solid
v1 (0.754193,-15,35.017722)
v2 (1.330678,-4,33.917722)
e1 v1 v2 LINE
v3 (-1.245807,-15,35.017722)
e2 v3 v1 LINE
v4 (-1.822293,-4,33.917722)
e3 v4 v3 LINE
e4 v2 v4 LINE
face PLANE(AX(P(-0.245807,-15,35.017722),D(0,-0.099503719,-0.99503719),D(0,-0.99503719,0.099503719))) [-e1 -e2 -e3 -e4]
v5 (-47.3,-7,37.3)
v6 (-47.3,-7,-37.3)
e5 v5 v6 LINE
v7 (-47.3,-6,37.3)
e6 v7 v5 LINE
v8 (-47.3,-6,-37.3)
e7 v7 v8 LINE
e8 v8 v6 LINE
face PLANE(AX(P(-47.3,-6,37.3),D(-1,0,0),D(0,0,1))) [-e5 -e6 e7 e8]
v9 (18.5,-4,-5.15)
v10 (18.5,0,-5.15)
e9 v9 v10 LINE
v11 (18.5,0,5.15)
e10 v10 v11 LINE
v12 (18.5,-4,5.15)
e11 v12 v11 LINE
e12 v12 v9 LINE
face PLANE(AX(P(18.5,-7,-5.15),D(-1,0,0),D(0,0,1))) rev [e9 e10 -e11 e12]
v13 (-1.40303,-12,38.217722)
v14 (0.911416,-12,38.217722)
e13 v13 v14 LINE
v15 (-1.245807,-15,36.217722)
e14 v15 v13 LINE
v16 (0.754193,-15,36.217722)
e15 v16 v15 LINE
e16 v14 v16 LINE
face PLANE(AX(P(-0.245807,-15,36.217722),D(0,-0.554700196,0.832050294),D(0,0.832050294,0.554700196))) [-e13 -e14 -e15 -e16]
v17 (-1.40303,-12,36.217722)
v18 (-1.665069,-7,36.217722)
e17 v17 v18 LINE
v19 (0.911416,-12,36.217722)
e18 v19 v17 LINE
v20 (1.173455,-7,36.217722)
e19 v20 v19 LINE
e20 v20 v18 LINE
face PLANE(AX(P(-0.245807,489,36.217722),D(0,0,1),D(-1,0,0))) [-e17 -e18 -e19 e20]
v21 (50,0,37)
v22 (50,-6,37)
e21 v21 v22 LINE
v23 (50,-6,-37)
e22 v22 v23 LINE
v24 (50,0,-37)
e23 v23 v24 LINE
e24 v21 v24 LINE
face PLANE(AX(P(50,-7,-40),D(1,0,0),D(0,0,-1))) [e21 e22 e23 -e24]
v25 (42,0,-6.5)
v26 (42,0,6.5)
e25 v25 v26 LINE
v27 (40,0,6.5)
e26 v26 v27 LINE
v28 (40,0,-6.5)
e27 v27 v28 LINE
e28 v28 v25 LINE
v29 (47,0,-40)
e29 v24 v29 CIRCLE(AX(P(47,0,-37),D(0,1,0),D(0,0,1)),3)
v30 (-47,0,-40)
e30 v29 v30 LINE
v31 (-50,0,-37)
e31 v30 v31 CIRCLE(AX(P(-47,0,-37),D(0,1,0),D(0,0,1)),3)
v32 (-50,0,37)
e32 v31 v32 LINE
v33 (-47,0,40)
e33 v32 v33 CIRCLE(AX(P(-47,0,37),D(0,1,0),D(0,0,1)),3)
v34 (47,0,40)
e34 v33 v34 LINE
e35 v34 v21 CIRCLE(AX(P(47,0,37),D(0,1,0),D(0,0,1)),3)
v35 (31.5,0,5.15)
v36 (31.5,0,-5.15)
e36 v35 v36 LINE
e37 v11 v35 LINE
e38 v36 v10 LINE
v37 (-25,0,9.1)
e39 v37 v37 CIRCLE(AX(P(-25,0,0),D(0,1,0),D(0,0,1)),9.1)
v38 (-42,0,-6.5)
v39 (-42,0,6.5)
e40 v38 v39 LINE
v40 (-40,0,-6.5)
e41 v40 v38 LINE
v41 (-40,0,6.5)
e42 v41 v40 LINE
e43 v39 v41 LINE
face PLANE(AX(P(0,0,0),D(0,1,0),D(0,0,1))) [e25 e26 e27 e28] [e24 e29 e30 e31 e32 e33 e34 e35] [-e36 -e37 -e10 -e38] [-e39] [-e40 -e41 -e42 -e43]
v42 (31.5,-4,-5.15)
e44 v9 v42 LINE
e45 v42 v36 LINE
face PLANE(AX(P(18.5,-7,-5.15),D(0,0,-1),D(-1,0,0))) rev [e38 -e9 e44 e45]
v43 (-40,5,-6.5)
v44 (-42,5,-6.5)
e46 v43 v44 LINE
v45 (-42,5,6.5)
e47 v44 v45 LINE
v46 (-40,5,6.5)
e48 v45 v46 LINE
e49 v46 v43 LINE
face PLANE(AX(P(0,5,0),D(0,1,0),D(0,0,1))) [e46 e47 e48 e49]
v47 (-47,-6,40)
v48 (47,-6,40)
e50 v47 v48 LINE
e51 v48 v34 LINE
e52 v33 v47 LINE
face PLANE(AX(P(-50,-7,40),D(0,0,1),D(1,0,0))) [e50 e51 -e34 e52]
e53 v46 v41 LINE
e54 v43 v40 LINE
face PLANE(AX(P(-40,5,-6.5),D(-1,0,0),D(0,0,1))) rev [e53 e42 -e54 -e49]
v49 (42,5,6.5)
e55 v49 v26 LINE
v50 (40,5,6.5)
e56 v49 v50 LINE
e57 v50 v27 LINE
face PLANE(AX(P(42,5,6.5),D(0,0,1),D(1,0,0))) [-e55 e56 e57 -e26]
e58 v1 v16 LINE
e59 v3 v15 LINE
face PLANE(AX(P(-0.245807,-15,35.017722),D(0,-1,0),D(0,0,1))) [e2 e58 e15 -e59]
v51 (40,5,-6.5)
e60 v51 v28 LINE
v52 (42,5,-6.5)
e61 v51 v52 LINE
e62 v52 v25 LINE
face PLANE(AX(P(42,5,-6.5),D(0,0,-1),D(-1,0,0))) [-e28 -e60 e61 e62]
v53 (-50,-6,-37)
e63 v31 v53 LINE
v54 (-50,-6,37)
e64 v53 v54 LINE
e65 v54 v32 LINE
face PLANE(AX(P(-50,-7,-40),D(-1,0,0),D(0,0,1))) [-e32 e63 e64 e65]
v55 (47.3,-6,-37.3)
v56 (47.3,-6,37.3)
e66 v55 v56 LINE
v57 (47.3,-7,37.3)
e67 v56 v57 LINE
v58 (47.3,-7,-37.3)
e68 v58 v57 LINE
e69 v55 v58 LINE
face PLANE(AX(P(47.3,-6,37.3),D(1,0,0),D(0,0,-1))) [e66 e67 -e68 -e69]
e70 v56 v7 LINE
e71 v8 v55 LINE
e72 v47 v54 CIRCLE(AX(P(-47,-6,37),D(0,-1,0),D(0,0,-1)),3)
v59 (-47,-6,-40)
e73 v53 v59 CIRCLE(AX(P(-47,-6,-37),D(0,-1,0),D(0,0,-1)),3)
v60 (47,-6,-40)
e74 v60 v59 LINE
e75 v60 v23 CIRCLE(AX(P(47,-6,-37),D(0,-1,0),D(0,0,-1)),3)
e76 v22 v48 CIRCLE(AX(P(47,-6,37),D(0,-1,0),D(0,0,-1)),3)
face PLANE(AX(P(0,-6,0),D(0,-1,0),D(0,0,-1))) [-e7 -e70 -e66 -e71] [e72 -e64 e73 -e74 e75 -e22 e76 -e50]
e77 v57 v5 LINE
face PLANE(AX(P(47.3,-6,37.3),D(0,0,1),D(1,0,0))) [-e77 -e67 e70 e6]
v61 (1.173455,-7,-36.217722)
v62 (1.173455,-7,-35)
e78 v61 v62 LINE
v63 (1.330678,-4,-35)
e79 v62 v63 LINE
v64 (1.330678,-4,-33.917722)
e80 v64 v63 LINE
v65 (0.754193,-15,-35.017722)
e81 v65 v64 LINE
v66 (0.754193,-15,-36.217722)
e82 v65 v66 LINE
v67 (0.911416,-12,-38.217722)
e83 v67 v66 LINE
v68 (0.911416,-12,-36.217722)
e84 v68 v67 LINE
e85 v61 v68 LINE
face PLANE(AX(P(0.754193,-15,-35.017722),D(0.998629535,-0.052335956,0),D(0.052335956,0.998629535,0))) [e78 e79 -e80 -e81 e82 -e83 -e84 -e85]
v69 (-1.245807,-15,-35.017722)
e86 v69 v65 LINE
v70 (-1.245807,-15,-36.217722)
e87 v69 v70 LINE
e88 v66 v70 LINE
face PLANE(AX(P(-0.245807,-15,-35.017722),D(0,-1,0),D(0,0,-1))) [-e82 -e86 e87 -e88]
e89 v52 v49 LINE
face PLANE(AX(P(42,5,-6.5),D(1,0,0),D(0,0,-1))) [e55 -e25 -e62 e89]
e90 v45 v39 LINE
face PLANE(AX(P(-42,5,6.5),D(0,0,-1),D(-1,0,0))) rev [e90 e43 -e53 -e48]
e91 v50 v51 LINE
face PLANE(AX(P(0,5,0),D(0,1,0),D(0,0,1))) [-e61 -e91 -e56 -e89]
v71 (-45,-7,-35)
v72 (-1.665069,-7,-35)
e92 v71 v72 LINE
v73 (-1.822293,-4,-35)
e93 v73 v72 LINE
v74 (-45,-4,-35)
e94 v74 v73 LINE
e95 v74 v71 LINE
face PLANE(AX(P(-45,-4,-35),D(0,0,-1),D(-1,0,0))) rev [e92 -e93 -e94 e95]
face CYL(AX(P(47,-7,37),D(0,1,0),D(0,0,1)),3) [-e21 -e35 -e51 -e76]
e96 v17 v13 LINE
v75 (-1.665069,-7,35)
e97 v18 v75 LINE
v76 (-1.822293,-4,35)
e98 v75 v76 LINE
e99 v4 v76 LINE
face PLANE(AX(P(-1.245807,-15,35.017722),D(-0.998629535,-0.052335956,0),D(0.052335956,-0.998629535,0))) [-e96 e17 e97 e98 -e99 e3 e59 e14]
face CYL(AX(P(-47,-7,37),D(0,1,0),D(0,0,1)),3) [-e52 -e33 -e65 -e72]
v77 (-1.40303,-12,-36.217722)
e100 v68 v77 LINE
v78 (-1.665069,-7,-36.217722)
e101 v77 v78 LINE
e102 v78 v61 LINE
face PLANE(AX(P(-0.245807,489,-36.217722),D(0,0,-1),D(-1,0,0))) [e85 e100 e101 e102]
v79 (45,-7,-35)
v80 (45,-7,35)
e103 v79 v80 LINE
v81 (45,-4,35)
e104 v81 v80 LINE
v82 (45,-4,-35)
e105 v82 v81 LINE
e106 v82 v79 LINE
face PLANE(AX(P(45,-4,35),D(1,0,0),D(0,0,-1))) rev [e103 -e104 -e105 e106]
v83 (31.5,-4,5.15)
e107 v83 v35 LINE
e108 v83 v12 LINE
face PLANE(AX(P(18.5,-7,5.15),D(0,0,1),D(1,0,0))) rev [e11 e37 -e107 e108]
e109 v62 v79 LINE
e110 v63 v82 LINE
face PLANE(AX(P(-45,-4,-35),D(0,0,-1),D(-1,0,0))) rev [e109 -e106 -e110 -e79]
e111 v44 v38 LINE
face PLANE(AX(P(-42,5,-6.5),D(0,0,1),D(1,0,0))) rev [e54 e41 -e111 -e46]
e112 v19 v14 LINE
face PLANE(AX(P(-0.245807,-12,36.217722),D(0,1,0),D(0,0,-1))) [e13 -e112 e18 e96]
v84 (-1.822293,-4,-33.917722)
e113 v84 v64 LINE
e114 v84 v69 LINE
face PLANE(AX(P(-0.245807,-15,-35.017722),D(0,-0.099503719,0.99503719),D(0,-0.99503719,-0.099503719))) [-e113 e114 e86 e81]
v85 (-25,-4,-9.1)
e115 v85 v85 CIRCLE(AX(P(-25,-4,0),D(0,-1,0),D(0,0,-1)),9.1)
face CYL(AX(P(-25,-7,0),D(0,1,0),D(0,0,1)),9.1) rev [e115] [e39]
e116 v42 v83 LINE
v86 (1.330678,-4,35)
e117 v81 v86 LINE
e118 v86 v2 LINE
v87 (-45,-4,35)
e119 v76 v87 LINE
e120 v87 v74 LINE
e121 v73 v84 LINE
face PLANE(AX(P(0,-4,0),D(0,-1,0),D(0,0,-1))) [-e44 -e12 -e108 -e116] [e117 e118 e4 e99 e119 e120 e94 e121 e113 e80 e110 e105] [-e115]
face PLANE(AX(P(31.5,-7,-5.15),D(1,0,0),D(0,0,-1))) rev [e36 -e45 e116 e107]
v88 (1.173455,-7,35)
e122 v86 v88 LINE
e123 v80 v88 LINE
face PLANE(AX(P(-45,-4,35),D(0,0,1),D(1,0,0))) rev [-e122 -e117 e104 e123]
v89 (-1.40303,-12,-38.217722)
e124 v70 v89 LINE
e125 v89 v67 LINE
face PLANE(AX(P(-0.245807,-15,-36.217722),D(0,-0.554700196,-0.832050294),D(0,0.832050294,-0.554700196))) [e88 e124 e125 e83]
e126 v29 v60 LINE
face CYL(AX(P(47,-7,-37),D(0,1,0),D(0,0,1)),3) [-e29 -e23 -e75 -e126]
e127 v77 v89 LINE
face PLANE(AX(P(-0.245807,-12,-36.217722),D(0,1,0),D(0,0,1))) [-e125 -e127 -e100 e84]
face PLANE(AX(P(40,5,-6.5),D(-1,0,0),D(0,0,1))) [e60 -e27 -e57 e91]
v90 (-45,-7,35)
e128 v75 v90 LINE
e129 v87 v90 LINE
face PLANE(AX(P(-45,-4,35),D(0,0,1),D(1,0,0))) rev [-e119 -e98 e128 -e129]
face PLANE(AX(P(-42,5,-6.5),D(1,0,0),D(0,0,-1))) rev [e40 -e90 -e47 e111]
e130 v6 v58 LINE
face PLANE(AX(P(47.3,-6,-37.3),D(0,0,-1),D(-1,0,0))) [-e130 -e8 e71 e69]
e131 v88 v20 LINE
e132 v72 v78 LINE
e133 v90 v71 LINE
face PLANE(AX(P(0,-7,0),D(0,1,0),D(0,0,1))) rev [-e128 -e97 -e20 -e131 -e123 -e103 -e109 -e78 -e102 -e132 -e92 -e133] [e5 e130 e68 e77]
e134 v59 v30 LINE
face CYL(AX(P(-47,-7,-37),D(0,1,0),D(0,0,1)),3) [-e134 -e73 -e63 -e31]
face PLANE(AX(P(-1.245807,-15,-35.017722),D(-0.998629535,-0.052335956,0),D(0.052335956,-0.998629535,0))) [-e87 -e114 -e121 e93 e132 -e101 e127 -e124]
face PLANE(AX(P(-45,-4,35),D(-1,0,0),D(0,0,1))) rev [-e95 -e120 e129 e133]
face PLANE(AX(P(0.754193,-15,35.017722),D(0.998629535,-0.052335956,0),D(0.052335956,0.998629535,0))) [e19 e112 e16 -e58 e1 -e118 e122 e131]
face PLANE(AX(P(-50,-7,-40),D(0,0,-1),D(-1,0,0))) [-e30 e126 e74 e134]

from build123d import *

# Parameters (mm, degrees)
SKETCH1_W           = 100
SKETCH1_H           = 80
BOSS_EXTRUDE1_DEPTH = 7
SKETCH2_W           = 90
SKETCH2_H           = 70
CUT_EXTRUDE1_DEPTH  = 3
SKETCH3_OUTSIDE_W   = 127.65
SKETCH3_OUTSIDE_H   = 107.65
SKETCH3_OUTSIDE_W_2 = 94.6
SKETCH3_OUTSIDE_H_2 = 74.6
CUT_EXTRUDE2_DEPTH  = 1
SKETCH4_W           = 2
SKETCH4_H           = 13
BOSS_EXTRUDE2_DEPTH = 5
SKETCH5_W           = 13
SKETCH5_H           = 10.3
CUT_EXTRUDE3_DEPTH  = 65.412731661
SKETCH6_R           = 9.1
CUT_EXTRUDE4_DEPTH  = 65.412731661
FILLET1_R           = 3
SNAP_START          = -36.217722162
SNAP_HOOK2_DEPTH    = 1.2
SNAP_START_2        = -36.063805806
SNAP_HOOK2_2_DEPTH  = 1.063805806
SNAP_START_3        = -1.403030484
SNAP_HOOK2_3_DEPTH  = 2.314446676
SNAP_START_4        = -1.822292718
SNAP_HOOK2_4_DEPTH  = 3.152971144
SNAP_START_5        = -35
SNAP_HOOK2_5_DEPTH  = 2
SNAP_START_6        = -39
SNAP_HOOK2_6_DEPTH  = 4


with BuildPart() as part:
    # Sketch1 → Boss-Extrude1 (new body)
    with BuildSketch(Plane(origin=(0, 0, 0), x_dir=(1, 0, 0), z_dir=(0, 1, 0))):
        Rectangle(SKETCH1_W, SKETCH1_H)
    extrude(amount=-BOSS_EXTRUDE1_DEPTH)

    # Sketch2 → Cut-Extrude1 (cut)
    with BuildSketch(Plane.XZ.offset(7)):
        Rectangle(SKETCH2_W, SKETCH2_H)
    extrude(amount=-CUT_EXTRUDE1_DEPTH, mode=Mode.SUBTRACT)

    # Sketch3 outside → Cut-Extrude2 (cut)
    with BuildSketch(Plane(origin=(0, -7, 0), x_dir=(-1, 0, 0), z_dir=(0, -1, 0))):
        Rectangle(SKETCH3_OUTSIDE_W, SKETCH3_OUTSIDE_H)
        Rectangle(SKETCH3_OUTSIDE_W_2, SKETCH3_OUTSIDE_H_2, mode=Mode.SUBTRACT)
    extrude(amount=-CUT_EXTRUDE2_DEPTH, mode=Mode.SUBTRACT)

    # Sketch4 → Boss-Extrude2 (add)
    with BuildSketch(Plane(origin=(0, 0, 0), x_dir=(1, 0, 0), z_dir=(0, 1, 0))):
        with Locations((-41, 0)):
            Rectangle(SKETCH4_W, SKETCH4_H)
    boss_extrude2 = extrude(amount=BOSS_EXTRUDE2_DEPTH)

    # Mirror2: Boss-Extrude2 across plane
    add(boss_extrude2.mirror(Plane(origin=(0, 0, 0), x_dir=(0, 0, 1), z_dir=(1, 0, 0))))

    # Sketch5 → Cut-Extrude3 (cut, through all)
    with BuildSketch(Plane(origin=(0, 0, 0), x_dir=(1, 0, 0), z_dir=(0, 1, 0))):
        with Locations((25, 0)):
            Rectangle(SKETCH5_W, SKETCH5_H)
    extrude(amount=-CUT_EXTRUDE3_DEPTH, mode=Mode.SUBTRACT)

    # Sketch6 → Cut-Extrude4 (cut, through all)
    with BuildSketch(Plane(origin=(0, 0, 0), x_dir=(1, 0, 0), z_dir=(0, 1, 0))):
        with Locations(Location((-25, 0, 0), (0, 0, 270))):
            Circle(SKETCH6_R)
    extrude(amount=-CUT_EXTRUDE4_DEPTH, mode=Mode.SUBTRACT)

    # Fillet1
    fillet1_edges = [part.edges().sort_by_distance(p)[0] for p in [
        (50, -3, -40),
        (-50, -3, -40),
        (-50, -3, 40),
        (50, -3, 40),
    ]]
    fillet(fillet1_edges, radius=FILLET1_R)

    # Snap Hook2: read off the stored shape, not the designer's step
    # Snap Hook2 outline → Snap Hook2 (add)
    with BuildSketch(Plane.XY.offset(SNAP_START)):
        Polygon((-1.245807146, -15), (0.754192854, -15), (1.173455088, -7), (-1.66506938, -7), align=None)
    snap_hook2 = extrude(amount=SNAP_HOOK2_DEPTH)

    # Snap Hook2 2 outline → Snap Hook2 2 (add)
    with BuildSketch(Plane.XY.offset(SNAP_START_2)):
        Polygon((-1.66506938, -7), (-1.403030484, -12), (0.911416192, -12), (1.173455088, -7), align=None)
    snap_hook2_2 = extrude(amount=SNAP_HOOK2_2_DEPTH)

    # Snap Hook2 3 outline → Snap Hook2 3 (add)
    with BuildSketch(Plane.YZ.offset(SNAP_START_3)):
        Polygon((-12, -36.217722162), (-15, -36.217722162), (-12, -38.217722162), align=None)
        Polygon((-4, -35), (-4, -33.917722162), (-15, -35.017722162), (-12, -35.017722162), (-12, -35), align=None)
    snap_hook2_3 = extrude(amount=SNAP_HOOK2_3_DEPTH)

    # Snap Hook2 4 outline → Snap Hook2 4 (add)
    with BuildSketch(Plane.YZ.offset(SNAP_START_4)):
        Polygon((-4, -35), (-4, -33.917722162), (-15, -35.017722162), (-12, -35.017722162), (-12, -35), align=None)
    snap_hook2_4 = extrude(amount=SNAP_HOOK2_4_DEPTH)

    # Snap Hook2 5 outline → Snap Hook2 5 (cut)
    with BuildSketch(Plane.XY.offset(SNAP_START_5)):
        Polygon((-1.822292718, -4), (-1.822292718, -16), (-1.193399367, -16), (-1.245807146, -15), align=None)
        Polygon((0.754192854, -15), (0.701785075, -16), (1.330678426, -16), (1.330678426, -4), align=None)
    snap_hook2_5 = extrude(amount=SNAP_HOOK2_5_DEPTH, mode=Mode.SUBTRACT)

    # Snap Hook2 6 outline → Snap Hook2 6 (cut)
    with BuildSketch(Plane.XY.offset(SNAP_START_6)):
        Polygon((-1.822292718, -16), (-1.193399367, -16), (-1.245807146, -15), (-1.403030484, -12), (-1.822292718, -12), align=None)
        Polygon((0.754192854, -15), (0.701785075, -16), (1.330678426, -16), (1.330678426, -12), (0.911416192, -12), align=None)
    snap_hook2_6 = extrude(amount=SNAP_HOOK2_6_DEPTH, mode=Mode.SUBTRACT)

    # Mirror4: Snap Hook2, Snap Hook2 2, Snap Hook2 3, Snap Hook2 4, Snap Hook2 5, Snap Hook2 6 across plane
    add(snap_hook2.mirror(Plane.XY))
    add(snap_hook2_2.mirror(Plane.XY))
    add(snap_hook2_3.mirror(Plane.XY))
    add(snap_hook2_4.mirror(Plane.XY))
    add(snap_hook2_5.mirror(Plane.XY), mode=Mode.SUBTRACT)
    add(snap_hook2_6.mirror(Plane.XY), mode=Mode.SUBTRACT)


solid = part.part
